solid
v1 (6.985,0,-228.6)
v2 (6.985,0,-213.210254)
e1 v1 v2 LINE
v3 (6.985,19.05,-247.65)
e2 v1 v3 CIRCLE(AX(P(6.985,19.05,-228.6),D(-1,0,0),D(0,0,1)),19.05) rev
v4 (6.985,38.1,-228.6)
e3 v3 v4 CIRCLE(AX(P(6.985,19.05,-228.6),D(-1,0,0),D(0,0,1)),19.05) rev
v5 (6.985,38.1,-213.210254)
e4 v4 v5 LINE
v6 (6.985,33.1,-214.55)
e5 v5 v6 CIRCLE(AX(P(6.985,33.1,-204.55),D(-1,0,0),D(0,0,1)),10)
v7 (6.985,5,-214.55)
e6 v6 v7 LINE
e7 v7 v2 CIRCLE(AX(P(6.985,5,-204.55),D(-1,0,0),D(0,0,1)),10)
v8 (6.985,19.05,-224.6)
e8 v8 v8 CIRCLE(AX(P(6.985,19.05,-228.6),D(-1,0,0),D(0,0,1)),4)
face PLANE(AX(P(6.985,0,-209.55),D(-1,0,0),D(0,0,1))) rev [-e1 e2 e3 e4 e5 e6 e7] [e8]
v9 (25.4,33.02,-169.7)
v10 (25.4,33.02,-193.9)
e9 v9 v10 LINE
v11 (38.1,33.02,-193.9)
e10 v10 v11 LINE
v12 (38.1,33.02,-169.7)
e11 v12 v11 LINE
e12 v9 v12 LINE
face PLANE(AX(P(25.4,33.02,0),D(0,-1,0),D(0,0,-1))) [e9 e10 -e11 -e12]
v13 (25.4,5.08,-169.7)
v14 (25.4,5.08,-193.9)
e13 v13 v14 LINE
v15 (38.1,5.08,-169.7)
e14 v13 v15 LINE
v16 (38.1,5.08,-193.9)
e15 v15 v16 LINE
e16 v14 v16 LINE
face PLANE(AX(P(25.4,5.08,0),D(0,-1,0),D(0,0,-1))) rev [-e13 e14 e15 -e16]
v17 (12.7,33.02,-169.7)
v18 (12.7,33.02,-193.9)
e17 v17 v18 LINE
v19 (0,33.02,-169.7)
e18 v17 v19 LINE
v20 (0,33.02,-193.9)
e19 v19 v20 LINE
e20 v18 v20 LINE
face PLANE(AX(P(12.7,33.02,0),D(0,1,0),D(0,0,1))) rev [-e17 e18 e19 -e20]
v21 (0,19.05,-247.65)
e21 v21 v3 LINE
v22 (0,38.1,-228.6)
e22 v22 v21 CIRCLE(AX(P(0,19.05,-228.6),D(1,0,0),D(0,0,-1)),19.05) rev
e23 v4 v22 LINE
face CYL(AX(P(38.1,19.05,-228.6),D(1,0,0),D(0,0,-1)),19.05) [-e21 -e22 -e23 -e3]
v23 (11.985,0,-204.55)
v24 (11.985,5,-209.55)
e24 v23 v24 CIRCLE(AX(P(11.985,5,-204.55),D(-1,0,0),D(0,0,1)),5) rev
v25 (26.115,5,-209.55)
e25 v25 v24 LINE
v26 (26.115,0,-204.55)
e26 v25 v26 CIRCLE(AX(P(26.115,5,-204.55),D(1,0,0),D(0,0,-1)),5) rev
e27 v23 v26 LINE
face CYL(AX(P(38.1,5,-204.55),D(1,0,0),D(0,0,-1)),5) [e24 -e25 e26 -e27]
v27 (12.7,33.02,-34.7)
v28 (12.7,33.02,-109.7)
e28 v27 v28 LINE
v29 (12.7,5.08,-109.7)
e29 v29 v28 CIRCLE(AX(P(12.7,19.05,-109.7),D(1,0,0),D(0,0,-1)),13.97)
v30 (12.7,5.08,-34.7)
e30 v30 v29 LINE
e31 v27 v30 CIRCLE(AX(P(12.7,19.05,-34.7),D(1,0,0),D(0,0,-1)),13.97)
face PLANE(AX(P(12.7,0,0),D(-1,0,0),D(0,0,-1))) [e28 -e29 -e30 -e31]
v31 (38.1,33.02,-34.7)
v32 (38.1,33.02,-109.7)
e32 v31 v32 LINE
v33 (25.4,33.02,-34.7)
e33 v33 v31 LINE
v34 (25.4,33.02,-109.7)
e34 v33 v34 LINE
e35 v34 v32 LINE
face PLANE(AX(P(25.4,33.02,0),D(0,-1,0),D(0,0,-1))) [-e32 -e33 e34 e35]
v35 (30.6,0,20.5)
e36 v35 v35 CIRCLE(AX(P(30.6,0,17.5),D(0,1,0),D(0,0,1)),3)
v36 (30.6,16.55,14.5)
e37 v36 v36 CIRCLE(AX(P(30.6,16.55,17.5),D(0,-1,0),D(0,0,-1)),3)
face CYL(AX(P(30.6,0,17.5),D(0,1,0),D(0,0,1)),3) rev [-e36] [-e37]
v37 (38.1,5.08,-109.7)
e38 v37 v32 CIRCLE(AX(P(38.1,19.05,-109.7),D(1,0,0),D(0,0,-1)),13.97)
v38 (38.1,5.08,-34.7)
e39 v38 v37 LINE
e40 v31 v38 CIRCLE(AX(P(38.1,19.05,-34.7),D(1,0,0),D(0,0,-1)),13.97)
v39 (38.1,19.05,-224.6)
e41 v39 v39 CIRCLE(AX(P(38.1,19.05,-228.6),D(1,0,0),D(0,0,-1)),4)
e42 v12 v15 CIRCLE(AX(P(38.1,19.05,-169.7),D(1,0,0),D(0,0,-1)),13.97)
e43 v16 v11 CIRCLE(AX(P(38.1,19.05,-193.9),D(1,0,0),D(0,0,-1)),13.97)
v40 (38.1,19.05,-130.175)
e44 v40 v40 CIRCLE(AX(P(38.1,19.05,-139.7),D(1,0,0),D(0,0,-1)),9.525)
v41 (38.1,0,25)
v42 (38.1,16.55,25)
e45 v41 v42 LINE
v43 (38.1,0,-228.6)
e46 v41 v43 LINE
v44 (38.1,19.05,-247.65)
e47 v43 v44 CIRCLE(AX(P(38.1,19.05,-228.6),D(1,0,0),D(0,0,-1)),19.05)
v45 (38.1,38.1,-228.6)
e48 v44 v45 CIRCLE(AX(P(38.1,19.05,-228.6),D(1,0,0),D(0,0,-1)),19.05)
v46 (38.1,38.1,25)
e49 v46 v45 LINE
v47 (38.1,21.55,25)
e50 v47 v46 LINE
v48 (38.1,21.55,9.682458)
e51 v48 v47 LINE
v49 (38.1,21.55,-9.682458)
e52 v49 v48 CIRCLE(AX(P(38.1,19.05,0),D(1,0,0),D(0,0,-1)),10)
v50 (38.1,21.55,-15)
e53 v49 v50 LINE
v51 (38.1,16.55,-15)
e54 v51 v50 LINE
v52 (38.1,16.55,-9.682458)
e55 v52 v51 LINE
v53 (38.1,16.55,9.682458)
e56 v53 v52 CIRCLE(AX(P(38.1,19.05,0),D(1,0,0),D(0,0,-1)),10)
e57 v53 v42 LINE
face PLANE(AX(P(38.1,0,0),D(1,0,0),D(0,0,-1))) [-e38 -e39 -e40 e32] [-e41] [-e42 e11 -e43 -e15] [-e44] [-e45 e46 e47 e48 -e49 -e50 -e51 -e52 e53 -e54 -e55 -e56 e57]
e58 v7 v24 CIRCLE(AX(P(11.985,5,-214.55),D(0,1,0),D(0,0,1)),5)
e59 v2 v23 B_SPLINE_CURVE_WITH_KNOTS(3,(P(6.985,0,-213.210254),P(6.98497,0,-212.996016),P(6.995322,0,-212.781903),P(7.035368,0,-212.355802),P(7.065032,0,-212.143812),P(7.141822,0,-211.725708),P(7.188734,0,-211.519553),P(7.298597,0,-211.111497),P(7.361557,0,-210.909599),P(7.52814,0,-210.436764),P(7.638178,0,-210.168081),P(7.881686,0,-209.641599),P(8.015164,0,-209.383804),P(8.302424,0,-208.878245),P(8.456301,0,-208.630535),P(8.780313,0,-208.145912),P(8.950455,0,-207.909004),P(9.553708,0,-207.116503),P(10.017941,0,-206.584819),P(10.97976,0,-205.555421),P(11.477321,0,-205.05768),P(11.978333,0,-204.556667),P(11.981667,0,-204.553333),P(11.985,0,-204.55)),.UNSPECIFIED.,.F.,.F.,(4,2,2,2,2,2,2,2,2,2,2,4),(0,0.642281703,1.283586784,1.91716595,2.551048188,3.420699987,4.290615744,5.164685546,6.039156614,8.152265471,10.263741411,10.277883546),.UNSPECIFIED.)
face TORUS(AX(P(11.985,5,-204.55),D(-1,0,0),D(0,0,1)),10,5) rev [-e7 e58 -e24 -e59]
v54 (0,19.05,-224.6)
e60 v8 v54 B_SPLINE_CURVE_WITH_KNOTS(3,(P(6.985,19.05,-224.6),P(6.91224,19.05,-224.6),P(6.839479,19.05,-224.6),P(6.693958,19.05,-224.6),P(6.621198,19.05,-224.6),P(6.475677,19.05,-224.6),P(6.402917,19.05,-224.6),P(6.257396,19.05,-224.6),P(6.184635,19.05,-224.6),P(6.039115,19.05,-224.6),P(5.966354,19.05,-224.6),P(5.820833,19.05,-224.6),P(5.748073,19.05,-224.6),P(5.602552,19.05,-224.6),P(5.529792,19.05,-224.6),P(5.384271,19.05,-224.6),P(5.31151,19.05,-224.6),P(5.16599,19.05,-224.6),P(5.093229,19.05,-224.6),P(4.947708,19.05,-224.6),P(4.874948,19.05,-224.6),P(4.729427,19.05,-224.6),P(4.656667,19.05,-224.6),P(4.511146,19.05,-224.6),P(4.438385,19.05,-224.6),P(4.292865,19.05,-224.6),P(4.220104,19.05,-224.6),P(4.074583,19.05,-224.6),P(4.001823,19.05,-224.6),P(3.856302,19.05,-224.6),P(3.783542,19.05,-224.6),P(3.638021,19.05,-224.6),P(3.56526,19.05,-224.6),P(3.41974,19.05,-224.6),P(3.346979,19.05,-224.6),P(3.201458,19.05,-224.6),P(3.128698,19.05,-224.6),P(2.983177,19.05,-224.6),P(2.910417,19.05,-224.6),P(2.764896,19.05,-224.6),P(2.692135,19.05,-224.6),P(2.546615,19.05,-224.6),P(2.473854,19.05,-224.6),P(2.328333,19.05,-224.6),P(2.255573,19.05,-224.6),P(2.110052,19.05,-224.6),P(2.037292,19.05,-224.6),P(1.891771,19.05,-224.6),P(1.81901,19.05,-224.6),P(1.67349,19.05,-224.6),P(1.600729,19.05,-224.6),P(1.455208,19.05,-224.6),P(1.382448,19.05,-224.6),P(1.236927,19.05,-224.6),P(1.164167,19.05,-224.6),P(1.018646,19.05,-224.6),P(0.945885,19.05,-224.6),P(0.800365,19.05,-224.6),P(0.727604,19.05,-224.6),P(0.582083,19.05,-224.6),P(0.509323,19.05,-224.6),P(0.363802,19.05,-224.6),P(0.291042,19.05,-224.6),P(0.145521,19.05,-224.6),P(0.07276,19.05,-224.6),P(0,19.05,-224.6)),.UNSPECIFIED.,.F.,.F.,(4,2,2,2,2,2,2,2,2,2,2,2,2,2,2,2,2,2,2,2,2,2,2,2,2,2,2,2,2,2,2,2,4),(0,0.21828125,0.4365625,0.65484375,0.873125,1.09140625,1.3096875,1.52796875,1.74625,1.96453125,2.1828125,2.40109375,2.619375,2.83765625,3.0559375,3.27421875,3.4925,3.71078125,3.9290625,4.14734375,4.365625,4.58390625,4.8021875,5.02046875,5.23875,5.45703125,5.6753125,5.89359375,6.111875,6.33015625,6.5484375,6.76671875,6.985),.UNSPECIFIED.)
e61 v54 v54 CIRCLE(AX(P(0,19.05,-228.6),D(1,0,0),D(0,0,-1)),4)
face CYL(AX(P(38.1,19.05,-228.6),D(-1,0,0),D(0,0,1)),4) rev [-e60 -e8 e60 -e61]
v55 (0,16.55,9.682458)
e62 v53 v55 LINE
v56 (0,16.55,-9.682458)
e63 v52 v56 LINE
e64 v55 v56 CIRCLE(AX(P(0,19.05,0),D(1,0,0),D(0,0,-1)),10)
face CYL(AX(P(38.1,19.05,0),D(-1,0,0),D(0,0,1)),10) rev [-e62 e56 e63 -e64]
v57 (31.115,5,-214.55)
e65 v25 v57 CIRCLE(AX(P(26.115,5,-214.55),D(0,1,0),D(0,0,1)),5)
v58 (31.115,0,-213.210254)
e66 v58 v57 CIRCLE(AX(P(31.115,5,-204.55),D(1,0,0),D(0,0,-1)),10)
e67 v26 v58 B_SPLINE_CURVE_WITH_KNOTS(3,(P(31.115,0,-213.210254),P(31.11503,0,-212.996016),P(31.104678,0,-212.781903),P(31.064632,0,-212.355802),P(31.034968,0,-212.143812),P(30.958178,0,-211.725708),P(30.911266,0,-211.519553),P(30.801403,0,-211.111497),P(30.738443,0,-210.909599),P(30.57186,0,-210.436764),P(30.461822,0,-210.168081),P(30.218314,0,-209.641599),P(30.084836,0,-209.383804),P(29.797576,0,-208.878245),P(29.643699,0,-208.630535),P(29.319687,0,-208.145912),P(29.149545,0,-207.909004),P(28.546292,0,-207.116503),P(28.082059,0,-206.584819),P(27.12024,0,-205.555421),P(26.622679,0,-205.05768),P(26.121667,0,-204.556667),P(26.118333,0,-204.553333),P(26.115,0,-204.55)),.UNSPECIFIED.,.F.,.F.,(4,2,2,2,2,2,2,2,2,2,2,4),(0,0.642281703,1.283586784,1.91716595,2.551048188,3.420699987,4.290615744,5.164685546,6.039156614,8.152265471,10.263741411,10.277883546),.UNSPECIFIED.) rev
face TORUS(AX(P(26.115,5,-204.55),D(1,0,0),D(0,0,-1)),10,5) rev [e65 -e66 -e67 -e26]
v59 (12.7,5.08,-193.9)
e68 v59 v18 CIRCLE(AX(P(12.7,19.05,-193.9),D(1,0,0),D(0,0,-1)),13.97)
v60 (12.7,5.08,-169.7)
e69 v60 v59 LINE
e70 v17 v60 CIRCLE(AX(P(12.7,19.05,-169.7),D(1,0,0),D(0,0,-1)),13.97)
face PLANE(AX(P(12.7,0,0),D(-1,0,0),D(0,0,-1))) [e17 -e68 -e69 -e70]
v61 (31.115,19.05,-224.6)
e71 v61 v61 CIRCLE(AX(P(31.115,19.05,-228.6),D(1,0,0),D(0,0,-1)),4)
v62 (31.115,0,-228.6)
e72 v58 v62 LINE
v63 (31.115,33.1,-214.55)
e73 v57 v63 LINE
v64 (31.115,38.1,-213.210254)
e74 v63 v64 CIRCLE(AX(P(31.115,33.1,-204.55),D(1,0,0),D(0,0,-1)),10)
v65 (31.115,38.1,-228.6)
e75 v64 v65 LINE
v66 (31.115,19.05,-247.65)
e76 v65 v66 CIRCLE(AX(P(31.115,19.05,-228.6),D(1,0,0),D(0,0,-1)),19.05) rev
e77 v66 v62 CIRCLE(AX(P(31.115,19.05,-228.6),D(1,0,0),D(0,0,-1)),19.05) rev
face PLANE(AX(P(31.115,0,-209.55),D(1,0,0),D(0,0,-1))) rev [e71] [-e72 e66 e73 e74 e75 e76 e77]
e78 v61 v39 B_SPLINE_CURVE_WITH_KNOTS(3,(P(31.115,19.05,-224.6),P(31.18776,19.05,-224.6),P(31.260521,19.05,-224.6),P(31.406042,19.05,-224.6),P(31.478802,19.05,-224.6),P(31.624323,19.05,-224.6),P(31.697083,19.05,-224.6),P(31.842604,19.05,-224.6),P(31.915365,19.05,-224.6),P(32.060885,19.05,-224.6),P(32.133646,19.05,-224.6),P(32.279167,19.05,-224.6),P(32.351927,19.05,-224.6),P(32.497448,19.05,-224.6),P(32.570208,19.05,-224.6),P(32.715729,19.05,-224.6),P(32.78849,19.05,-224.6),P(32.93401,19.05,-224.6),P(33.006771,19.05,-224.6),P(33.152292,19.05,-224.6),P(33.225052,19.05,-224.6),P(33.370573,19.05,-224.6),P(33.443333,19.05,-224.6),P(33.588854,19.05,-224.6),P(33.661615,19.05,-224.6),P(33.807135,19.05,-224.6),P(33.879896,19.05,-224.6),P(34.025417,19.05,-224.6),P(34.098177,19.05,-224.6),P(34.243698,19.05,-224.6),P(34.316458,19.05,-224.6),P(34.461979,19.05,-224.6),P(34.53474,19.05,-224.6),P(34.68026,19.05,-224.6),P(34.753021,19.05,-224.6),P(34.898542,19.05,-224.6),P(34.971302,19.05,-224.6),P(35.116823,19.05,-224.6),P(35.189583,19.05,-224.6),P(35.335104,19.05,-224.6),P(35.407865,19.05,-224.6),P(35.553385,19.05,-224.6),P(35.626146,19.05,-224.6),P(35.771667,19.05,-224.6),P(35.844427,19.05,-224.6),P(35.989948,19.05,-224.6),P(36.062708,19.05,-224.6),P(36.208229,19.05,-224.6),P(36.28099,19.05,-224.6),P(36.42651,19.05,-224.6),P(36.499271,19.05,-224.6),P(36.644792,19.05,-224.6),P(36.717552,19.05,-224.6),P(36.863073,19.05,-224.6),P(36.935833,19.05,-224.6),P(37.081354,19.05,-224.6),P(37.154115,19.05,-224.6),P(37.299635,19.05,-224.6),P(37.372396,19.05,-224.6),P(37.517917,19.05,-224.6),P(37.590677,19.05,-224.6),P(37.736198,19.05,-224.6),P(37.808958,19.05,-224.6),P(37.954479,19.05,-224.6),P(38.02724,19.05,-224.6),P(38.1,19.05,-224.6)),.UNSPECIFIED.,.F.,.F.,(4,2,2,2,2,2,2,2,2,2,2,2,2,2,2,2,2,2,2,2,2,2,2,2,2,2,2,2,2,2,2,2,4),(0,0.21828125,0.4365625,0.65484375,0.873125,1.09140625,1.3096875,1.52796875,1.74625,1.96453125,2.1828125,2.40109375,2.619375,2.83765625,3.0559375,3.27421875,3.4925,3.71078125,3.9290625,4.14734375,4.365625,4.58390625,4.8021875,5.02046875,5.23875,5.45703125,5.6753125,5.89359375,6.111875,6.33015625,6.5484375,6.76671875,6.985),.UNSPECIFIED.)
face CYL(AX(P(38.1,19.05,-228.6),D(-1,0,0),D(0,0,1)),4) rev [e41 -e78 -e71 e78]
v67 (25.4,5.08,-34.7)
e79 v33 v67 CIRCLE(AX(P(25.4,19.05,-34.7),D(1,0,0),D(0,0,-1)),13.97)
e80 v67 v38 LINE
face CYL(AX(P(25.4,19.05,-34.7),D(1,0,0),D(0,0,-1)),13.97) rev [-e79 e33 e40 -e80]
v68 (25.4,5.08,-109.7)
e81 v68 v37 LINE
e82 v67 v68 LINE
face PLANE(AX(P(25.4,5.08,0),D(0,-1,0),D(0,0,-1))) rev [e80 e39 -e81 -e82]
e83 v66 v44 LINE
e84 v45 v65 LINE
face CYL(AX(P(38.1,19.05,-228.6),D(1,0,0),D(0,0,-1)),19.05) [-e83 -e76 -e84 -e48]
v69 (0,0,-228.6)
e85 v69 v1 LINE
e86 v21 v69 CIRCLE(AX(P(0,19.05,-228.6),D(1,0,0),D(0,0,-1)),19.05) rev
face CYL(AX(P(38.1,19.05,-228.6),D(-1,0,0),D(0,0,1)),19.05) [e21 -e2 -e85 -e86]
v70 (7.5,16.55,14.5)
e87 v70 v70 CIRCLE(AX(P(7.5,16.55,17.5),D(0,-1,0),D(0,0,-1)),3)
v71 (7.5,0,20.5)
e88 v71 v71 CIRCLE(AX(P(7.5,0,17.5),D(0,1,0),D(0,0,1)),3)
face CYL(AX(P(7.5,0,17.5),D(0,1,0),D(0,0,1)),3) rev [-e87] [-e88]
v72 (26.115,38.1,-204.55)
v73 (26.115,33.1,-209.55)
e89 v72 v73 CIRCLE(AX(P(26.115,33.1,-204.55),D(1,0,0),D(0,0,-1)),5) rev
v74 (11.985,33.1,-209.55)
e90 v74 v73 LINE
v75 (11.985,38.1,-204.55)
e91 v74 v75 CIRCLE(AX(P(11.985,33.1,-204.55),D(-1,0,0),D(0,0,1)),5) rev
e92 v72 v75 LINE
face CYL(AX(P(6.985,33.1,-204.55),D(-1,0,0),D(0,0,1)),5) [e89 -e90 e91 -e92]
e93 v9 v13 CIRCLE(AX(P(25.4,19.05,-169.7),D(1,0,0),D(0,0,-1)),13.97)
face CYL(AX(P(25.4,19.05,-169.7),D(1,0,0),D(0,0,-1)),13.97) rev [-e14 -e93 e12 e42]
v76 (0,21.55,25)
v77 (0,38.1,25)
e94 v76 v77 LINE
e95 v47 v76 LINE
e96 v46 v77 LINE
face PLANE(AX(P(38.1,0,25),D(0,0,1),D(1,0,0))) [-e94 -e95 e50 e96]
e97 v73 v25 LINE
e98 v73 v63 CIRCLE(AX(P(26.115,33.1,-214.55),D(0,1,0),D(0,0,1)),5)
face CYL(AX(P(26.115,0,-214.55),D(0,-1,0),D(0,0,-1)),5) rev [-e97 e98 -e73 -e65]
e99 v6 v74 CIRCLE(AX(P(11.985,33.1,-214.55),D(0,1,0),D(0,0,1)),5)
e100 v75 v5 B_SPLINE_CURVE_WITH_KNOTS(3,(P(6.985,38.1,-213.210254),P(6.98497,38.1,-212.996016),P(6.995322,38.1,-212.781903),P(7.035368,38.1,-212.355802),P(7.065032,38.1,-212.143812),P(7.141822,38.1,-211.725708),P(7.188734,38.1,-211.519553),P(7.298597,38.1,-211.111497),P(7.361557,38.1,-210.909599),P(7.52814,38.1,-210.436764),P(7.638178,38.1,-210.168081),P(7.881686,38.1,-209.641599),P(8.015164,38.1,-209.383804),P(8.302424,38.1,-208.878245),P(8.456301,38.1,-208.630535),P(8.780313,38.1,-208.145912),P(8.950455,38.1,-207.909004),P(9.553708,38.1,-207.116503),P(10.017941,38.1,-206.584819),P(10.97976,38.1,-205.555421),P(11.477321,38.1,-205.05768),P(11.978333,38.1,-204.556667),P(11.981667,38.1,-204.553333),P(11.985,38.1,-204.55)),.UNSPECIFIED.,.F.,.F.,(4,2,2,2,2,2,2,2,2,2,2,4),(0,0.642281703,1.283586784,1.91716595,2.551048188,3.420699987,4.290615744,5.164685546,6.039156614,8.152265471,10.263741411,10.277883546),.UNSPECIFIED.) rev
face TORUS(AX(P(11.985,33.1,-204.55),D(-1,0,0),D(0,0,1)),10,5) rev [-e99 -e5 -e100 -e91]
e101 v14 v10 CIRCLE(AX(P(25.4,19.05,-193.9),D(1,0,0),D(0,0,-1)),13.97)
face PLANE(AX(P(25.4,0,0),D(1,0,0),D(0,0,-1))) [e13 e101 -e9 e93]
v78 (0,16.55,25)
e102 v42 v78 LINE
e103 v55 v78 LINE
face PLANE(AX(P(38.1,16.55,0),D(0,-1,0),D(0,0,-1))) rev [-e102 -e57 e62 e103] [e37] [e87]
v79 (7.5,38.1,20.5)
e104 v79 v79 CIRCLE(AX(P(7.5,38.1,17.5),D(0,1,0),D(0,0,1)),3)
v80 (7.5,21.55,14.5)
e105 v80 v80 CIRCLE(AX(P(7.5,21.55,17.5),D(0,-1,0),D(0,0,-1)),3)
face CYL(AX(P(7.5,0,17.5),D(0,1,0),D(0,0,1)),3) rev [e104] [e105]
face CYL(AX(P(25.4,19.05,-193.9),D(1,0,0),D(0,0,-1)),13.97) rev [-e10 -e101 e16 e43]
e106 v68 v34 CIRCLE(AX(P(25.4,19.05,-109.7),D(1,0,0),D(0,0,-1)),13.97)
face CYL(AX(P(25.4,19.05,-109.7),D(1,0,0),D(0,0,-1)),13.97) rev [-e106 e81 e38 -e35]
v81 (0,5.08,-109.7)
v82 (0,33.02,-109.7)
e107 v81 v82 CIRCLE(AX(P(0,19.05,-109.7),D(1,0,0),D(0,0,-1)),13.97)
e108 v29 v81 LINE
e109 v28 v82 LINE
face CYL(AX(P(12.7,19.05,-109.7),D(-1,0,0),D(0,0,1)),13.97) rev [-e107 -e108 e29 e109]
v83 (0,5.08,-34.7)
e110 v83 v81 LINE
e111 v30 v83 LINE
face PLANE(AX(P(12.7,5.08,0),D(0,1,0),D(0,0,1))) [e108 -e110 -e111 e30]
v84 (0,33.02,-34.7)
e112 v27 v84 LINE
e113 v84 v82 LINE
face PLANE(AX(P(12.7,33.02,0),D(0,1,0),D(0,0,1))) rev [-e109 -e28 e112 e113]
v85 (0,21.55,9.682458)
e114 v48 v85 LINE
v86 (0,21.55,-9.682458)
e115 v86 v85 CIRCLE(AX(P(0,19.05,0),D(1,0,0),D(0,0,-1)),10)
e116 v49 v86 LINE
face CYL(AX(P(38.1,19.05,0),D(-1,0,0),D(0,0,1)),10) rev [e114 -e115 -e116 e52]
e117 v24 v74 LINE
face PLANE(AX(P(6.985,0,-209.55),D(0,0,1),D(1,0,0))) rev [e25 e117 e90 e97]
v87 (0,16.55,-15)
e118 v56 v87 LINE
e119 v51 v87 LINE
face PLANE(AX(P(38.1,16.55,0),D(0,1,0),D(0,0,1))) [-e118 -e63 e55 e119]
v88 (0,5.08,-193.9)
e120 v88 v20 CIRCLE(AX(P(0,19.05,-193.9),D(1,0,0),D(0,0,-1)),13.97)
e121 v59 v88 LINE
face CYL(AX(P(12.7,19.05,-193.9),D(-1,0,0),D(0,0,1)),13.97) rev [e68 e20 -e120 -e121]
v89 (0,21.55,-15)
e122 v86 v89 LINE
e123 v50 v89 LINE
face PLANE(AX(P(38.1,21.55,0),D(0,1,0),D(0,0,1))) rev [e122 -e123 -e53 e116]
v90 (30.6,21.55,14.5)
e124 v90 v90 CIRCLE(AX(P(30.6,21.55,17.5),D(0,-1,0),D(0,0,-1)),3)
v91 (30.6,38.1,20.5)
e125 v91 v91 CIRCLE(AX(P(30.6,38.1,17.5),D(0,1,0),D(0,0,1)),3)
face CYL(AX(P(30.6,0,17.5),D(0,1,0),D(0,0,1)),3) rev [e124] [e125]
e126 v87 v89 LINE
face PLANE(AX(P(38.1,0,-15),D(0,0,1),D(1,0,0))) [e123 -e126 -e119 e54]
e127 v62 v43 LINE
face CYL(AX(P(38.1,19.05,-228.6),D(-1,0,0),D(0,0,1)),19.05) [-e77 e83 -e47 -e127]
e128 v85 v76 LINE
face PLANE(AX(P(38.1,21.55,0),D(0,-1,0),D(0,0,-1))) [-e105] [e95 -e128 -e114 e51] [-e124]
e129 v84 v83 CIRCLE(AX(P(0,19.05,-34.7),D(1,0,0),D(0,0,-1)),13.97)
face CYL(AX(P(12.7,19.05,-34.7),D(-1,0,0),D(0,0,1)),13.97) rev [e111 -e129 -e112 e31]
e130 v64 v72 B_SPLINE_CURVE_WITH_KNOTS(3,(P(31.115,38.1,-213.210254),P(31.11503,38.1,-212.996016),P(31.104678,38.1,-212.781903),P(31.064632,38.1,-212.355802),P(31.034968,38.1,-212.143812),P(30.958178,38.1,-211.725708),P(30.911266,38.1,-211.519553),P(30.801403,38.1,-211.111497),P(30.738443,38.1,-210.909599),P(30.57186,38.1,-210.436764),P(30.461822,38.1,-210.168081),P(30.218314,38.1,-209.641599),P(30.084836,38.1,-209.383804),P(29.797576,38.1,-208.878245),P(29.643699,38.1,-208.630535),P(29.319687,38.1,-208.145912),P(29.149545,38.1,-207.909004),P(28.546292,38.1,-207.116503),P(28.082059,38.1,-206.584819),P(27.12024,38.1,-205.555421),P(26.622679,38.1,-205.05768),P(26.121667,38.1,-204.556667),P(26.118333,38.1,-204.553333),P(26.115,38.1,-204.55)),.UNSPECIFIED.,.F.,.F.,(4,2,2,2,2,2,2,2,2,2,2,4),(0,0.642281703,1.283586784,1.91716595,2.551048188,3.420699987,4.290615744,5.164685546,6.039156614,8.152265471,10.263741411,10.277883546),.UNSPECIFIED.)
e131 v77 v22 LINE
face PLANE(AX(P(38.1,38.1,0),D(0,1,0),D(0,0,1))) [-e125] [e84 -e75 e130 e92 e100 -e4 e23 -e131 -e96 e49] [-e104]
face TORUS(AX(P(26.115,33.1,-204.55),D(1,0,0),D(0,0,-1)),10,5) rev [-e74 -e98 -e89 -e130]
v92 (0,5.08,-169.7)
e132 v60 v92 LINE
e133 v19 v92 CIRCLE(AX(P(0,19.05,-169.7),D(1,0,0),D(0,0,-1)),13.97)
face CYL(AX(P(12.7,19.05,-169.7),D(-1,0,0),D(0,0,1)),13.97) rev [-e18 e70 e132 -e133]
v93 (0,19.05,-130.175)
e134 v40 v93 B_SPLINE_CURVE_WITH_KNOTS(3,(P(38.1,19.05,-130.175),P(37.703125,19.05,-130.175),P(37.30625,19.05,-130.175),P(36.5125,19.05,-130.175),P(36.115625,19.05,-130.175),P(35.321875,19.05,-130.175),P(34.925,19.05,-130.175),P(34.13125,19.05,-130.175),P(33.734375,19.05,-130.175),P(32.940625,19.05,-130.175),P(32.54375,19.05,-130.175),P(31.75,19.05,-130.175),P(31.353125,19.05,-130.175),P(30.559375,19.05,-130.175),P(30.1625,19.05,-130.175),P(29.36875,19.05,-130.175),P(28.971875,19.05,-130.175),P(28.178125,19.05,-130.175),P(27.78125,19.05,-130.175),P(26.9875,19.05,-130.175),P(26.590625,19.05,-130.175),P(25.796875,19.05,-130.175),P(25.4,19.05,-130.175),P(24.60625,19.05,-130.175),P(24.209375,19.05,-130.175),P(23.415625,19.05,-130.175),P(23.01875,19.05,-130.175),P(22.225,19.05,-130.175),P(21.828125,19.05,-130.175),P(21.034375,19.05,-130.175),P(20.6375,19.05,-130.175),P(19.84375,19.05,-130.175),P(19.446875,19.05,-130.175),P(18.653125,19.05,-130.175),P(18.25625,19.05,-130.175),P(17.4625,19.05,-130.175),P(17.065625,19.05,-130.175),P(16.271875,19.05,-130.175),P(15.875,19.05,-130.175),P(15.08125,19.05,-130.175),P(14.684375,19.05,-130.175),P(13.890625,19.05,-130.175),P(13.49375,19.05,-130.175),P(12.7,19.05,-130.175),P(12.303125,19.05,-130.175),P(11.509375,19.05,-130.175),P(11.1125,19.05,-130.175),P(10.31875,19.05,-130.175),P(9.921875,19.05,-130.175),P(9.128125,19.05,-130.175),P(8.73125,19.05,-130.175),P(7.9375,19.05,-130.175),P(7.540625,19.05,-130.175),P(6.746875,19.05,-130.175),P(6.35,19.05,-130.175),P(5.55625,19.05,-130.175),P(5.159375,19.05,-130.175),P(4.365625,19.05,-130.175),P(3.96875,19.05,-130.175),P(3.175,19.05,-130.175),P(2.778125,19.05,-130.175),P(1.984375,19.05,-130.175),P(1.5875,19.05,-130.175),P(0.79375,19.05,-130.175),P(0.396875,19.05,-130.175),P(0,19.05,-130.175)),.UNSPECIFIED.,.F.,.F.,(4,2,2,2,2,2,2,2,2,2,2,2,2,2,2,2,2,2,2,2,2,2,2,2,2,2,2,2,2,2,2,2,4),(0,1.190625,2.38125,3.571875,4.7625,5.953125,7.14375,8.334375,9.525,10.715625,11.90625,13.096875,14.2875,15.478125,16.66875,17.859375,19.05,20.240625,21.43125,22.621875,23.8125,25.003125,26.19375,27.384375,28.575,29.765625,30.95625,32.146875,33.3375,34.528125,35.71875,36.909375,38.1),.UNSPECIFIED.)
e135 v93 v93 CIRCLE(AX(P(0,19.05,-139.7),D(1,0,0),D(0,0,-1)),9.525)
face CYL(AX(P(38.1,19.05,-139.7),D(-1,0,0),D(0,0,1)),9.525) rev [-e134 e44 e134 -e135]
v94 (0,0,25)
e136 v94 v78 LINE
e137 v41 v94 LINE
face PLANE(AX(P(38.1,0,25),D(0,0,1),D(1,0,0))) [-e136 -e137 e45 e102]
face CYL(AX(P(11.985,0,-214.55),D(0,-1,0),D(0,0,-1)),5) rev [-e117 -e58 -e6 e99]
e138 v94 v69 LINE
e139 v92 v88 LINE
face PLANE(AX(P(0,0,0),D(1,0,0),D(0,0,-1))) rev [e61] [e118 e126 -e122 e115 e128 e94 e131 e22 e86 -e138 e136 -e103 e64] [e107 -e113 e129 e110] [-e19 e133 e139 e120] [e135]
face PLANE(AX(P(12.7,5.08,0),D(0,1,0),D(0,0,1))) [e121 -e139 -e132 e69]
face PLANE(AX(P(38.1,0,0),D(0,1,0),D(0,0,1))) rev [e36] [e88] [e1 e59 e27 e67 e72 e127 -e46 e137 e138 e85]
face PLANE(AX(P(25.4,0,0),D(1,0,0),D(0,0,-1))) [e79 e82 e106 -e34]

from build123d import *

# Parameters (mm, degrees)
SKETCH1_R           = 9.525
SKETCH1_R_2         = 4
BOSS_EXTRUDE1_DEPTH = 38.1
FILLET1_R           = 19.05
SKETCH2_W           = 24.13
SKETCH2_H           = 38.1
CUT_EXTRUDE1_DEPTH  = 254.443765952
CUT_EXTRUDE2_DEPTH  = 12.7
SKETCH4_R           = 3
CUT_EXTRUDE3_DEPTH  = 254.443765952
FILLET4_R           = 5
FILLET5_R           = 5


# Some blends are built 0.0001 mm under size
with BuildPart() as part:
    # Sketch1 → Boss-Extrude1 (new body)
    with BuildSketch(Plane(origin=(0, 0, 0), x_dir=(0, 0, -1), z_dir=(1, 0, 0))):
        with BuildLine():
            ThreePointArc((9.682458366, 16.55), (0, 9.05), (-9.682458366, 16.55))
            Line((-9.682458366, 16.55), (-25, 16.55))
            Line((-25, 16.55), (-25, 0))
            Line((-25, 0), (247.65, 0))
            Line((247.65, 0), (247.65, 38.1))
            Line((247.65, 38.1), (-25, 38.1))
            Line((-25, 38.1), (-25, 21.55))
            Line((-25, 21.55), (-9.682458366, 21.55))
            ThreePointArc((-9.682458366, 21.55), (0, 29.05), (9.682458366, 21.55))
            Line((9.682458366, 21.55), (15, 21.55))
            Line((15, 21.55), (15, 16.55))
            Line((15, 16.55), (9.682458366, 16.55))
        make_face()
        with Locations(Location((139.7, 19.05, 0), (0, 0, 180))):
            Circle(SKETCH1_R, mode=Mode.SUBTRACT)
        with Locations(Location((228.6, 19.05, 0), (0, 0, 180))):
            Circle(SKETCH1_R_2, mode=Mode.SUBTRACT)
    extrude(amount=BOSS_EXTRUDE1_DEPTH)

    # Fillet1
    fillet1_edges = [part.edges().sort_by_distance(p)[0] for p in [
        (19.05, 0, -247.65),
        (19.05, 38.1, -247.65),
    ]]
    fillet(fillet1_edges, radius=FILLET1_R - 0.0001)  # a hair under: the kernel refuses the full size

    # Sketch2 → Cut-Extrude1 (cut, through all)
    with BuildSketch(Plane(origin=(0, 38.1, 0), x_dir=(1, 0, 0), z_dir=(0, 1, 0))):
        with Locations((19.05, 228.6)):
            Rectangle(SKETCH2_W, SKETCH2_H)
    extrude(amount=-CUT_EXTRUDE1_DEPTH, mode=Mode.SUBTRACT)

    # Sketch3 → Cut-Extrude2 (cut)
    with BuildSketch(Plane(origin=(38.1, 0, 0), x_dir=(0, 0, -1), z_dir=(1, 0, 0))):
        with BuildLine():
            Line((34.7, 5.08), (109.7, 5.08))
            ThreePointArc((109.7, 5.08), (123.67, 19.05), (109.7, 33.02))
            Line((109.7, 33.02), (34.7, 33.02))
            ThreePointArc((34.7, 33.02), (20.73, 19.05), (34.7, 5.08))
        make_face()
        with BuildLine():
            Line((169.7, 5.08), (193.9, 5.08))
            ThreePointArc((193.9, 5.08), (207.87, 19.05), (193.9, 33.02))
            Line((193.9, 33.02), (169.7, 33.02))
            ThreePointArc((169.7, 33.02), (155.73, 19.05), (169.7, 5.08))
        make_face()
        with BuildLine():
            ThreePointArc((31.430916309, 19.05), (30.759207099, 25.513256042), (28.772789625, 31.700259965))
            ThreePointArc((28.772789625, 31.700259965), (20.73, 19.05), (28.772789625, 6.399740035))
            ThreePointArc((28.772789625, 6.399740035), (30.759207099, 12.586743958), (31.430916309, 19.05))
        make_face()
    cut_extrude2 = extrude(amount=-CUT_EXTRUDE2_DEPTH, mode=Mode.SUBTRACT)

    # Mirror1: Cut-Extrude2 across plane
    add(cut_extrude2.mirror(Plane(origin=(19.05, 0, 0), x_dir=(0, 0, 1), z_dir=(1, 0, 0))), mode=Mode.SUBTRACT)

    # Sketch4 → Cut-Extrude3 (cut, through all)
    with BuildSketch(Plane(origin=(0, 38.1, 0), x_dir=(1, 0, 0), z_dir=(0, 1, 0))):
        with Locations(Location((7.5, -17.5, 0), (0, 0, 270))):
            Circle(SKETCH4_R)
        with Locations(Location((30.6, -17.5, 0), (0, 0, 270))):
            Circle(SKETCH4_R)
    extrude(amount=-CUT_EXTRUDE3_DEPTH, mode=Mode.SUBTRACT)

    # Fillet4
    fillet4_edges = [part.edges().sort_by_distance(p)[0] for p in [
        (19.05, 38.1, -209.55),
        (19.05, 0, -209.55),
    ]]
    fillet(fillet4_edges, radius=FILLET4_R)

    # Fillet5
    # the kernel refuses this fillet: 5 mm, written as the material it adds along each edge
    with BuildSketch(Plane(origin=(31.115, 33.1, -209.55), x_dir=(-1, 0, 0), z_dir=(0, -1, 0))) as fillet5_piece_1:
        with BuildLine():
            CenterArc((FILLET5_R, FILLET5_R), FILLET5_R, 180, 90)
            Line((0, FILLET5_R), (0, 0))
            Line((0, 0), (FILLET5_R, 0))
        make_face()
    extrude(amount=28.1)
    with BuildSketch(Plane(origin=(6.985, 33.1, -209.55), x_dir=(1, 0, 0), z_dir=(0, -1, 0))) as fillet5_piece_2:
        with BuildLine():
            CenterArc((FILLET5_R, -FILLET5_R), FILLET5_R, 90, 90)
            Line((0, -FILLET5_R), (0, 0))
            Line((0, 0), (FILLET5_R, 0))
        make_face()
    extrude(amount=28.1)
    with BuildSketch(Plane(origin=(31.115, 5, -204.55), x_dir=(0, 0.8017442392976496, 0.597667277632826), z_dir=(0, 0.597667277632826, -0.8017442392976496))) as fillet5_piece_3_section:
        with BuildLine():
            CenterArc((5 + FILLET5_R, -FILLET5_R), FILLET5_R, 90, 90)
            Line((5 + FILLET5_R, 0), (5, 0))
            Line((5, 0), (5, -FILLET5_R))
        make_face()
    fillet5_piece_3 = revolve(axis=Axis((31.115, 5, -204.55), (1, 0, 0)), revolution_arc=233.296989237, mode=Mode.PRIVATE)
    fillet5_piece_3 = split(fillet5_piece_3, bisect_by=Plane(origin=(29.55685837, 0, -208.299694711), z_dir=(0, 1, 0)), keep=Keep.TOP, mode=Mode.PRIVATE)
    fillet5_piece_3 = fillet5_piece_3 - Plane(origin=(29.55685837, 19.05, -193.9), x_dir=(0, -1, 0), z_dir=(1, 0, 0)) * Cylinder(13.97, 41, mode=Mode.PRIVATE)
    add(fillet5_piece_3)
    with BuildSketch(Plane(origin=(6.985, 5, -204.55), x_dir=(0, 0.8017442392976496, 0.597667277632826), z_dir=(0, 0.597667277632826, -0.8017442392976496))) as fillet5_piece_4_section:
        with BuildLine():
            CenterArc((5 + FILLET5_R, FILLET5_R), FILLET5_R, 180, 90)
            Line((5, FILLET5_R), (5, 0))
            Line((5, 0), (5 + FILLET5_R, 0))
        make_face()
    fillet5_piece_4 = revolve(axis=Axis((6.985, 5, -204.55), (1, 0, 0)), revolution_arc=233.296989237, mode=Mode.PRIVATE)
    fillet5_piece_4 = split(fillet5_piece_4, bisect_by=Plane(origin=(8.543141587, 0, -208.299694664), z_dir=(0, 1, 0)), keep=Keep.TOP, mode=Mode.PRIVATE)
    fillet5_piece_4 = fillet5_piece_4 - Plane(origin=(8.543141587, 19.05, -193.9), x_dir=(0, -1, 0), z_dir=(-1, 0, 0)) * Cylinder(13.97, 41, mode=Mode.PRIVATE)
    add(fillet5_piece_4)
    with BuildSketch(Plane(origin=(31.115, 33.1, -204.55), x_dir=(0, 0, -1), z_dir=(0, -1, 0))) as fillet5_piece_5_section:
        with BuildLine():
            CenterArc((5 + FILLET5_R, -FILLET5_R), FILLET5_R, 90, 90)
            Line((5 + FILLET5_R, 0), (5, 0))
            Line((5, 0), (5, -FILLET5_R))
        make_face()
    fillet5_piece_5 = revolve(axis=Axis((31.115, 33.1, -204.55), (1, 0, 0)), revolution_arc=233.296989237, mode=Mode.PRIVATE)
    fillet5_piece_5 = split(fillet5_piece_5, bisect_by=Plane(origin=(29.556858367, 38.1, -208.299694701), z_dir=(0, -1, 0)), keep=Keep.TOP, mode=Mode.PRIVATE)
    fillet5_piece_5 = fillet5_piece_5 - Plane(origin=(29.556858367, 19.05, -193.9), x_dir=(0, -1, 0), z_dir=(1, 0, 0)) * Cylinder(13.97, 40, mode=Mode.PRIVATE)
    add(fillet5_piece_5)
    with BuildSketch(Plane(origin=(6.985, 33.1, -204.55), x_dir=(0, 0, -1), z_dir=(0, -1, 0))) as fillet5_piece_6_section:
        with BuildLine():
            CenterArc((5 + FILLET5_R, FILLET5_R), FILLET5_R, 180, 90)
            Line((5 + FILLET5_R, 0), (5, 0))
            Line((5, 0), (5, FILLET5_R))
        make_face()
    fillet5_piece_6 = revolve(axis=Axis((6.985, 33.1, -204.55), (1, 0, 0)), revolution_arc=233.296989237, mode=Mode.PRIVATE)
    fillet5_piece_6 = split(fillet5_piece_6, bisect_by=Plane(origin=(8.54314159, 38.1, -208.299694655), z_dir=(0, -1, 0)), keep=Keep.TOP, mode=Mode.PRIVATE)
    fillet5_piece_6 = fillet5_piece_6 - Plane(origin=(8.54314159, 19.05, -193.9), x_dir=(0, -1, 0), z_dir=(-1, 0, 0)) * Cylinder(13.97, 40, mode=Mode.PRIVATE)
    add(fillet5_piece_6)


solid = part.part
